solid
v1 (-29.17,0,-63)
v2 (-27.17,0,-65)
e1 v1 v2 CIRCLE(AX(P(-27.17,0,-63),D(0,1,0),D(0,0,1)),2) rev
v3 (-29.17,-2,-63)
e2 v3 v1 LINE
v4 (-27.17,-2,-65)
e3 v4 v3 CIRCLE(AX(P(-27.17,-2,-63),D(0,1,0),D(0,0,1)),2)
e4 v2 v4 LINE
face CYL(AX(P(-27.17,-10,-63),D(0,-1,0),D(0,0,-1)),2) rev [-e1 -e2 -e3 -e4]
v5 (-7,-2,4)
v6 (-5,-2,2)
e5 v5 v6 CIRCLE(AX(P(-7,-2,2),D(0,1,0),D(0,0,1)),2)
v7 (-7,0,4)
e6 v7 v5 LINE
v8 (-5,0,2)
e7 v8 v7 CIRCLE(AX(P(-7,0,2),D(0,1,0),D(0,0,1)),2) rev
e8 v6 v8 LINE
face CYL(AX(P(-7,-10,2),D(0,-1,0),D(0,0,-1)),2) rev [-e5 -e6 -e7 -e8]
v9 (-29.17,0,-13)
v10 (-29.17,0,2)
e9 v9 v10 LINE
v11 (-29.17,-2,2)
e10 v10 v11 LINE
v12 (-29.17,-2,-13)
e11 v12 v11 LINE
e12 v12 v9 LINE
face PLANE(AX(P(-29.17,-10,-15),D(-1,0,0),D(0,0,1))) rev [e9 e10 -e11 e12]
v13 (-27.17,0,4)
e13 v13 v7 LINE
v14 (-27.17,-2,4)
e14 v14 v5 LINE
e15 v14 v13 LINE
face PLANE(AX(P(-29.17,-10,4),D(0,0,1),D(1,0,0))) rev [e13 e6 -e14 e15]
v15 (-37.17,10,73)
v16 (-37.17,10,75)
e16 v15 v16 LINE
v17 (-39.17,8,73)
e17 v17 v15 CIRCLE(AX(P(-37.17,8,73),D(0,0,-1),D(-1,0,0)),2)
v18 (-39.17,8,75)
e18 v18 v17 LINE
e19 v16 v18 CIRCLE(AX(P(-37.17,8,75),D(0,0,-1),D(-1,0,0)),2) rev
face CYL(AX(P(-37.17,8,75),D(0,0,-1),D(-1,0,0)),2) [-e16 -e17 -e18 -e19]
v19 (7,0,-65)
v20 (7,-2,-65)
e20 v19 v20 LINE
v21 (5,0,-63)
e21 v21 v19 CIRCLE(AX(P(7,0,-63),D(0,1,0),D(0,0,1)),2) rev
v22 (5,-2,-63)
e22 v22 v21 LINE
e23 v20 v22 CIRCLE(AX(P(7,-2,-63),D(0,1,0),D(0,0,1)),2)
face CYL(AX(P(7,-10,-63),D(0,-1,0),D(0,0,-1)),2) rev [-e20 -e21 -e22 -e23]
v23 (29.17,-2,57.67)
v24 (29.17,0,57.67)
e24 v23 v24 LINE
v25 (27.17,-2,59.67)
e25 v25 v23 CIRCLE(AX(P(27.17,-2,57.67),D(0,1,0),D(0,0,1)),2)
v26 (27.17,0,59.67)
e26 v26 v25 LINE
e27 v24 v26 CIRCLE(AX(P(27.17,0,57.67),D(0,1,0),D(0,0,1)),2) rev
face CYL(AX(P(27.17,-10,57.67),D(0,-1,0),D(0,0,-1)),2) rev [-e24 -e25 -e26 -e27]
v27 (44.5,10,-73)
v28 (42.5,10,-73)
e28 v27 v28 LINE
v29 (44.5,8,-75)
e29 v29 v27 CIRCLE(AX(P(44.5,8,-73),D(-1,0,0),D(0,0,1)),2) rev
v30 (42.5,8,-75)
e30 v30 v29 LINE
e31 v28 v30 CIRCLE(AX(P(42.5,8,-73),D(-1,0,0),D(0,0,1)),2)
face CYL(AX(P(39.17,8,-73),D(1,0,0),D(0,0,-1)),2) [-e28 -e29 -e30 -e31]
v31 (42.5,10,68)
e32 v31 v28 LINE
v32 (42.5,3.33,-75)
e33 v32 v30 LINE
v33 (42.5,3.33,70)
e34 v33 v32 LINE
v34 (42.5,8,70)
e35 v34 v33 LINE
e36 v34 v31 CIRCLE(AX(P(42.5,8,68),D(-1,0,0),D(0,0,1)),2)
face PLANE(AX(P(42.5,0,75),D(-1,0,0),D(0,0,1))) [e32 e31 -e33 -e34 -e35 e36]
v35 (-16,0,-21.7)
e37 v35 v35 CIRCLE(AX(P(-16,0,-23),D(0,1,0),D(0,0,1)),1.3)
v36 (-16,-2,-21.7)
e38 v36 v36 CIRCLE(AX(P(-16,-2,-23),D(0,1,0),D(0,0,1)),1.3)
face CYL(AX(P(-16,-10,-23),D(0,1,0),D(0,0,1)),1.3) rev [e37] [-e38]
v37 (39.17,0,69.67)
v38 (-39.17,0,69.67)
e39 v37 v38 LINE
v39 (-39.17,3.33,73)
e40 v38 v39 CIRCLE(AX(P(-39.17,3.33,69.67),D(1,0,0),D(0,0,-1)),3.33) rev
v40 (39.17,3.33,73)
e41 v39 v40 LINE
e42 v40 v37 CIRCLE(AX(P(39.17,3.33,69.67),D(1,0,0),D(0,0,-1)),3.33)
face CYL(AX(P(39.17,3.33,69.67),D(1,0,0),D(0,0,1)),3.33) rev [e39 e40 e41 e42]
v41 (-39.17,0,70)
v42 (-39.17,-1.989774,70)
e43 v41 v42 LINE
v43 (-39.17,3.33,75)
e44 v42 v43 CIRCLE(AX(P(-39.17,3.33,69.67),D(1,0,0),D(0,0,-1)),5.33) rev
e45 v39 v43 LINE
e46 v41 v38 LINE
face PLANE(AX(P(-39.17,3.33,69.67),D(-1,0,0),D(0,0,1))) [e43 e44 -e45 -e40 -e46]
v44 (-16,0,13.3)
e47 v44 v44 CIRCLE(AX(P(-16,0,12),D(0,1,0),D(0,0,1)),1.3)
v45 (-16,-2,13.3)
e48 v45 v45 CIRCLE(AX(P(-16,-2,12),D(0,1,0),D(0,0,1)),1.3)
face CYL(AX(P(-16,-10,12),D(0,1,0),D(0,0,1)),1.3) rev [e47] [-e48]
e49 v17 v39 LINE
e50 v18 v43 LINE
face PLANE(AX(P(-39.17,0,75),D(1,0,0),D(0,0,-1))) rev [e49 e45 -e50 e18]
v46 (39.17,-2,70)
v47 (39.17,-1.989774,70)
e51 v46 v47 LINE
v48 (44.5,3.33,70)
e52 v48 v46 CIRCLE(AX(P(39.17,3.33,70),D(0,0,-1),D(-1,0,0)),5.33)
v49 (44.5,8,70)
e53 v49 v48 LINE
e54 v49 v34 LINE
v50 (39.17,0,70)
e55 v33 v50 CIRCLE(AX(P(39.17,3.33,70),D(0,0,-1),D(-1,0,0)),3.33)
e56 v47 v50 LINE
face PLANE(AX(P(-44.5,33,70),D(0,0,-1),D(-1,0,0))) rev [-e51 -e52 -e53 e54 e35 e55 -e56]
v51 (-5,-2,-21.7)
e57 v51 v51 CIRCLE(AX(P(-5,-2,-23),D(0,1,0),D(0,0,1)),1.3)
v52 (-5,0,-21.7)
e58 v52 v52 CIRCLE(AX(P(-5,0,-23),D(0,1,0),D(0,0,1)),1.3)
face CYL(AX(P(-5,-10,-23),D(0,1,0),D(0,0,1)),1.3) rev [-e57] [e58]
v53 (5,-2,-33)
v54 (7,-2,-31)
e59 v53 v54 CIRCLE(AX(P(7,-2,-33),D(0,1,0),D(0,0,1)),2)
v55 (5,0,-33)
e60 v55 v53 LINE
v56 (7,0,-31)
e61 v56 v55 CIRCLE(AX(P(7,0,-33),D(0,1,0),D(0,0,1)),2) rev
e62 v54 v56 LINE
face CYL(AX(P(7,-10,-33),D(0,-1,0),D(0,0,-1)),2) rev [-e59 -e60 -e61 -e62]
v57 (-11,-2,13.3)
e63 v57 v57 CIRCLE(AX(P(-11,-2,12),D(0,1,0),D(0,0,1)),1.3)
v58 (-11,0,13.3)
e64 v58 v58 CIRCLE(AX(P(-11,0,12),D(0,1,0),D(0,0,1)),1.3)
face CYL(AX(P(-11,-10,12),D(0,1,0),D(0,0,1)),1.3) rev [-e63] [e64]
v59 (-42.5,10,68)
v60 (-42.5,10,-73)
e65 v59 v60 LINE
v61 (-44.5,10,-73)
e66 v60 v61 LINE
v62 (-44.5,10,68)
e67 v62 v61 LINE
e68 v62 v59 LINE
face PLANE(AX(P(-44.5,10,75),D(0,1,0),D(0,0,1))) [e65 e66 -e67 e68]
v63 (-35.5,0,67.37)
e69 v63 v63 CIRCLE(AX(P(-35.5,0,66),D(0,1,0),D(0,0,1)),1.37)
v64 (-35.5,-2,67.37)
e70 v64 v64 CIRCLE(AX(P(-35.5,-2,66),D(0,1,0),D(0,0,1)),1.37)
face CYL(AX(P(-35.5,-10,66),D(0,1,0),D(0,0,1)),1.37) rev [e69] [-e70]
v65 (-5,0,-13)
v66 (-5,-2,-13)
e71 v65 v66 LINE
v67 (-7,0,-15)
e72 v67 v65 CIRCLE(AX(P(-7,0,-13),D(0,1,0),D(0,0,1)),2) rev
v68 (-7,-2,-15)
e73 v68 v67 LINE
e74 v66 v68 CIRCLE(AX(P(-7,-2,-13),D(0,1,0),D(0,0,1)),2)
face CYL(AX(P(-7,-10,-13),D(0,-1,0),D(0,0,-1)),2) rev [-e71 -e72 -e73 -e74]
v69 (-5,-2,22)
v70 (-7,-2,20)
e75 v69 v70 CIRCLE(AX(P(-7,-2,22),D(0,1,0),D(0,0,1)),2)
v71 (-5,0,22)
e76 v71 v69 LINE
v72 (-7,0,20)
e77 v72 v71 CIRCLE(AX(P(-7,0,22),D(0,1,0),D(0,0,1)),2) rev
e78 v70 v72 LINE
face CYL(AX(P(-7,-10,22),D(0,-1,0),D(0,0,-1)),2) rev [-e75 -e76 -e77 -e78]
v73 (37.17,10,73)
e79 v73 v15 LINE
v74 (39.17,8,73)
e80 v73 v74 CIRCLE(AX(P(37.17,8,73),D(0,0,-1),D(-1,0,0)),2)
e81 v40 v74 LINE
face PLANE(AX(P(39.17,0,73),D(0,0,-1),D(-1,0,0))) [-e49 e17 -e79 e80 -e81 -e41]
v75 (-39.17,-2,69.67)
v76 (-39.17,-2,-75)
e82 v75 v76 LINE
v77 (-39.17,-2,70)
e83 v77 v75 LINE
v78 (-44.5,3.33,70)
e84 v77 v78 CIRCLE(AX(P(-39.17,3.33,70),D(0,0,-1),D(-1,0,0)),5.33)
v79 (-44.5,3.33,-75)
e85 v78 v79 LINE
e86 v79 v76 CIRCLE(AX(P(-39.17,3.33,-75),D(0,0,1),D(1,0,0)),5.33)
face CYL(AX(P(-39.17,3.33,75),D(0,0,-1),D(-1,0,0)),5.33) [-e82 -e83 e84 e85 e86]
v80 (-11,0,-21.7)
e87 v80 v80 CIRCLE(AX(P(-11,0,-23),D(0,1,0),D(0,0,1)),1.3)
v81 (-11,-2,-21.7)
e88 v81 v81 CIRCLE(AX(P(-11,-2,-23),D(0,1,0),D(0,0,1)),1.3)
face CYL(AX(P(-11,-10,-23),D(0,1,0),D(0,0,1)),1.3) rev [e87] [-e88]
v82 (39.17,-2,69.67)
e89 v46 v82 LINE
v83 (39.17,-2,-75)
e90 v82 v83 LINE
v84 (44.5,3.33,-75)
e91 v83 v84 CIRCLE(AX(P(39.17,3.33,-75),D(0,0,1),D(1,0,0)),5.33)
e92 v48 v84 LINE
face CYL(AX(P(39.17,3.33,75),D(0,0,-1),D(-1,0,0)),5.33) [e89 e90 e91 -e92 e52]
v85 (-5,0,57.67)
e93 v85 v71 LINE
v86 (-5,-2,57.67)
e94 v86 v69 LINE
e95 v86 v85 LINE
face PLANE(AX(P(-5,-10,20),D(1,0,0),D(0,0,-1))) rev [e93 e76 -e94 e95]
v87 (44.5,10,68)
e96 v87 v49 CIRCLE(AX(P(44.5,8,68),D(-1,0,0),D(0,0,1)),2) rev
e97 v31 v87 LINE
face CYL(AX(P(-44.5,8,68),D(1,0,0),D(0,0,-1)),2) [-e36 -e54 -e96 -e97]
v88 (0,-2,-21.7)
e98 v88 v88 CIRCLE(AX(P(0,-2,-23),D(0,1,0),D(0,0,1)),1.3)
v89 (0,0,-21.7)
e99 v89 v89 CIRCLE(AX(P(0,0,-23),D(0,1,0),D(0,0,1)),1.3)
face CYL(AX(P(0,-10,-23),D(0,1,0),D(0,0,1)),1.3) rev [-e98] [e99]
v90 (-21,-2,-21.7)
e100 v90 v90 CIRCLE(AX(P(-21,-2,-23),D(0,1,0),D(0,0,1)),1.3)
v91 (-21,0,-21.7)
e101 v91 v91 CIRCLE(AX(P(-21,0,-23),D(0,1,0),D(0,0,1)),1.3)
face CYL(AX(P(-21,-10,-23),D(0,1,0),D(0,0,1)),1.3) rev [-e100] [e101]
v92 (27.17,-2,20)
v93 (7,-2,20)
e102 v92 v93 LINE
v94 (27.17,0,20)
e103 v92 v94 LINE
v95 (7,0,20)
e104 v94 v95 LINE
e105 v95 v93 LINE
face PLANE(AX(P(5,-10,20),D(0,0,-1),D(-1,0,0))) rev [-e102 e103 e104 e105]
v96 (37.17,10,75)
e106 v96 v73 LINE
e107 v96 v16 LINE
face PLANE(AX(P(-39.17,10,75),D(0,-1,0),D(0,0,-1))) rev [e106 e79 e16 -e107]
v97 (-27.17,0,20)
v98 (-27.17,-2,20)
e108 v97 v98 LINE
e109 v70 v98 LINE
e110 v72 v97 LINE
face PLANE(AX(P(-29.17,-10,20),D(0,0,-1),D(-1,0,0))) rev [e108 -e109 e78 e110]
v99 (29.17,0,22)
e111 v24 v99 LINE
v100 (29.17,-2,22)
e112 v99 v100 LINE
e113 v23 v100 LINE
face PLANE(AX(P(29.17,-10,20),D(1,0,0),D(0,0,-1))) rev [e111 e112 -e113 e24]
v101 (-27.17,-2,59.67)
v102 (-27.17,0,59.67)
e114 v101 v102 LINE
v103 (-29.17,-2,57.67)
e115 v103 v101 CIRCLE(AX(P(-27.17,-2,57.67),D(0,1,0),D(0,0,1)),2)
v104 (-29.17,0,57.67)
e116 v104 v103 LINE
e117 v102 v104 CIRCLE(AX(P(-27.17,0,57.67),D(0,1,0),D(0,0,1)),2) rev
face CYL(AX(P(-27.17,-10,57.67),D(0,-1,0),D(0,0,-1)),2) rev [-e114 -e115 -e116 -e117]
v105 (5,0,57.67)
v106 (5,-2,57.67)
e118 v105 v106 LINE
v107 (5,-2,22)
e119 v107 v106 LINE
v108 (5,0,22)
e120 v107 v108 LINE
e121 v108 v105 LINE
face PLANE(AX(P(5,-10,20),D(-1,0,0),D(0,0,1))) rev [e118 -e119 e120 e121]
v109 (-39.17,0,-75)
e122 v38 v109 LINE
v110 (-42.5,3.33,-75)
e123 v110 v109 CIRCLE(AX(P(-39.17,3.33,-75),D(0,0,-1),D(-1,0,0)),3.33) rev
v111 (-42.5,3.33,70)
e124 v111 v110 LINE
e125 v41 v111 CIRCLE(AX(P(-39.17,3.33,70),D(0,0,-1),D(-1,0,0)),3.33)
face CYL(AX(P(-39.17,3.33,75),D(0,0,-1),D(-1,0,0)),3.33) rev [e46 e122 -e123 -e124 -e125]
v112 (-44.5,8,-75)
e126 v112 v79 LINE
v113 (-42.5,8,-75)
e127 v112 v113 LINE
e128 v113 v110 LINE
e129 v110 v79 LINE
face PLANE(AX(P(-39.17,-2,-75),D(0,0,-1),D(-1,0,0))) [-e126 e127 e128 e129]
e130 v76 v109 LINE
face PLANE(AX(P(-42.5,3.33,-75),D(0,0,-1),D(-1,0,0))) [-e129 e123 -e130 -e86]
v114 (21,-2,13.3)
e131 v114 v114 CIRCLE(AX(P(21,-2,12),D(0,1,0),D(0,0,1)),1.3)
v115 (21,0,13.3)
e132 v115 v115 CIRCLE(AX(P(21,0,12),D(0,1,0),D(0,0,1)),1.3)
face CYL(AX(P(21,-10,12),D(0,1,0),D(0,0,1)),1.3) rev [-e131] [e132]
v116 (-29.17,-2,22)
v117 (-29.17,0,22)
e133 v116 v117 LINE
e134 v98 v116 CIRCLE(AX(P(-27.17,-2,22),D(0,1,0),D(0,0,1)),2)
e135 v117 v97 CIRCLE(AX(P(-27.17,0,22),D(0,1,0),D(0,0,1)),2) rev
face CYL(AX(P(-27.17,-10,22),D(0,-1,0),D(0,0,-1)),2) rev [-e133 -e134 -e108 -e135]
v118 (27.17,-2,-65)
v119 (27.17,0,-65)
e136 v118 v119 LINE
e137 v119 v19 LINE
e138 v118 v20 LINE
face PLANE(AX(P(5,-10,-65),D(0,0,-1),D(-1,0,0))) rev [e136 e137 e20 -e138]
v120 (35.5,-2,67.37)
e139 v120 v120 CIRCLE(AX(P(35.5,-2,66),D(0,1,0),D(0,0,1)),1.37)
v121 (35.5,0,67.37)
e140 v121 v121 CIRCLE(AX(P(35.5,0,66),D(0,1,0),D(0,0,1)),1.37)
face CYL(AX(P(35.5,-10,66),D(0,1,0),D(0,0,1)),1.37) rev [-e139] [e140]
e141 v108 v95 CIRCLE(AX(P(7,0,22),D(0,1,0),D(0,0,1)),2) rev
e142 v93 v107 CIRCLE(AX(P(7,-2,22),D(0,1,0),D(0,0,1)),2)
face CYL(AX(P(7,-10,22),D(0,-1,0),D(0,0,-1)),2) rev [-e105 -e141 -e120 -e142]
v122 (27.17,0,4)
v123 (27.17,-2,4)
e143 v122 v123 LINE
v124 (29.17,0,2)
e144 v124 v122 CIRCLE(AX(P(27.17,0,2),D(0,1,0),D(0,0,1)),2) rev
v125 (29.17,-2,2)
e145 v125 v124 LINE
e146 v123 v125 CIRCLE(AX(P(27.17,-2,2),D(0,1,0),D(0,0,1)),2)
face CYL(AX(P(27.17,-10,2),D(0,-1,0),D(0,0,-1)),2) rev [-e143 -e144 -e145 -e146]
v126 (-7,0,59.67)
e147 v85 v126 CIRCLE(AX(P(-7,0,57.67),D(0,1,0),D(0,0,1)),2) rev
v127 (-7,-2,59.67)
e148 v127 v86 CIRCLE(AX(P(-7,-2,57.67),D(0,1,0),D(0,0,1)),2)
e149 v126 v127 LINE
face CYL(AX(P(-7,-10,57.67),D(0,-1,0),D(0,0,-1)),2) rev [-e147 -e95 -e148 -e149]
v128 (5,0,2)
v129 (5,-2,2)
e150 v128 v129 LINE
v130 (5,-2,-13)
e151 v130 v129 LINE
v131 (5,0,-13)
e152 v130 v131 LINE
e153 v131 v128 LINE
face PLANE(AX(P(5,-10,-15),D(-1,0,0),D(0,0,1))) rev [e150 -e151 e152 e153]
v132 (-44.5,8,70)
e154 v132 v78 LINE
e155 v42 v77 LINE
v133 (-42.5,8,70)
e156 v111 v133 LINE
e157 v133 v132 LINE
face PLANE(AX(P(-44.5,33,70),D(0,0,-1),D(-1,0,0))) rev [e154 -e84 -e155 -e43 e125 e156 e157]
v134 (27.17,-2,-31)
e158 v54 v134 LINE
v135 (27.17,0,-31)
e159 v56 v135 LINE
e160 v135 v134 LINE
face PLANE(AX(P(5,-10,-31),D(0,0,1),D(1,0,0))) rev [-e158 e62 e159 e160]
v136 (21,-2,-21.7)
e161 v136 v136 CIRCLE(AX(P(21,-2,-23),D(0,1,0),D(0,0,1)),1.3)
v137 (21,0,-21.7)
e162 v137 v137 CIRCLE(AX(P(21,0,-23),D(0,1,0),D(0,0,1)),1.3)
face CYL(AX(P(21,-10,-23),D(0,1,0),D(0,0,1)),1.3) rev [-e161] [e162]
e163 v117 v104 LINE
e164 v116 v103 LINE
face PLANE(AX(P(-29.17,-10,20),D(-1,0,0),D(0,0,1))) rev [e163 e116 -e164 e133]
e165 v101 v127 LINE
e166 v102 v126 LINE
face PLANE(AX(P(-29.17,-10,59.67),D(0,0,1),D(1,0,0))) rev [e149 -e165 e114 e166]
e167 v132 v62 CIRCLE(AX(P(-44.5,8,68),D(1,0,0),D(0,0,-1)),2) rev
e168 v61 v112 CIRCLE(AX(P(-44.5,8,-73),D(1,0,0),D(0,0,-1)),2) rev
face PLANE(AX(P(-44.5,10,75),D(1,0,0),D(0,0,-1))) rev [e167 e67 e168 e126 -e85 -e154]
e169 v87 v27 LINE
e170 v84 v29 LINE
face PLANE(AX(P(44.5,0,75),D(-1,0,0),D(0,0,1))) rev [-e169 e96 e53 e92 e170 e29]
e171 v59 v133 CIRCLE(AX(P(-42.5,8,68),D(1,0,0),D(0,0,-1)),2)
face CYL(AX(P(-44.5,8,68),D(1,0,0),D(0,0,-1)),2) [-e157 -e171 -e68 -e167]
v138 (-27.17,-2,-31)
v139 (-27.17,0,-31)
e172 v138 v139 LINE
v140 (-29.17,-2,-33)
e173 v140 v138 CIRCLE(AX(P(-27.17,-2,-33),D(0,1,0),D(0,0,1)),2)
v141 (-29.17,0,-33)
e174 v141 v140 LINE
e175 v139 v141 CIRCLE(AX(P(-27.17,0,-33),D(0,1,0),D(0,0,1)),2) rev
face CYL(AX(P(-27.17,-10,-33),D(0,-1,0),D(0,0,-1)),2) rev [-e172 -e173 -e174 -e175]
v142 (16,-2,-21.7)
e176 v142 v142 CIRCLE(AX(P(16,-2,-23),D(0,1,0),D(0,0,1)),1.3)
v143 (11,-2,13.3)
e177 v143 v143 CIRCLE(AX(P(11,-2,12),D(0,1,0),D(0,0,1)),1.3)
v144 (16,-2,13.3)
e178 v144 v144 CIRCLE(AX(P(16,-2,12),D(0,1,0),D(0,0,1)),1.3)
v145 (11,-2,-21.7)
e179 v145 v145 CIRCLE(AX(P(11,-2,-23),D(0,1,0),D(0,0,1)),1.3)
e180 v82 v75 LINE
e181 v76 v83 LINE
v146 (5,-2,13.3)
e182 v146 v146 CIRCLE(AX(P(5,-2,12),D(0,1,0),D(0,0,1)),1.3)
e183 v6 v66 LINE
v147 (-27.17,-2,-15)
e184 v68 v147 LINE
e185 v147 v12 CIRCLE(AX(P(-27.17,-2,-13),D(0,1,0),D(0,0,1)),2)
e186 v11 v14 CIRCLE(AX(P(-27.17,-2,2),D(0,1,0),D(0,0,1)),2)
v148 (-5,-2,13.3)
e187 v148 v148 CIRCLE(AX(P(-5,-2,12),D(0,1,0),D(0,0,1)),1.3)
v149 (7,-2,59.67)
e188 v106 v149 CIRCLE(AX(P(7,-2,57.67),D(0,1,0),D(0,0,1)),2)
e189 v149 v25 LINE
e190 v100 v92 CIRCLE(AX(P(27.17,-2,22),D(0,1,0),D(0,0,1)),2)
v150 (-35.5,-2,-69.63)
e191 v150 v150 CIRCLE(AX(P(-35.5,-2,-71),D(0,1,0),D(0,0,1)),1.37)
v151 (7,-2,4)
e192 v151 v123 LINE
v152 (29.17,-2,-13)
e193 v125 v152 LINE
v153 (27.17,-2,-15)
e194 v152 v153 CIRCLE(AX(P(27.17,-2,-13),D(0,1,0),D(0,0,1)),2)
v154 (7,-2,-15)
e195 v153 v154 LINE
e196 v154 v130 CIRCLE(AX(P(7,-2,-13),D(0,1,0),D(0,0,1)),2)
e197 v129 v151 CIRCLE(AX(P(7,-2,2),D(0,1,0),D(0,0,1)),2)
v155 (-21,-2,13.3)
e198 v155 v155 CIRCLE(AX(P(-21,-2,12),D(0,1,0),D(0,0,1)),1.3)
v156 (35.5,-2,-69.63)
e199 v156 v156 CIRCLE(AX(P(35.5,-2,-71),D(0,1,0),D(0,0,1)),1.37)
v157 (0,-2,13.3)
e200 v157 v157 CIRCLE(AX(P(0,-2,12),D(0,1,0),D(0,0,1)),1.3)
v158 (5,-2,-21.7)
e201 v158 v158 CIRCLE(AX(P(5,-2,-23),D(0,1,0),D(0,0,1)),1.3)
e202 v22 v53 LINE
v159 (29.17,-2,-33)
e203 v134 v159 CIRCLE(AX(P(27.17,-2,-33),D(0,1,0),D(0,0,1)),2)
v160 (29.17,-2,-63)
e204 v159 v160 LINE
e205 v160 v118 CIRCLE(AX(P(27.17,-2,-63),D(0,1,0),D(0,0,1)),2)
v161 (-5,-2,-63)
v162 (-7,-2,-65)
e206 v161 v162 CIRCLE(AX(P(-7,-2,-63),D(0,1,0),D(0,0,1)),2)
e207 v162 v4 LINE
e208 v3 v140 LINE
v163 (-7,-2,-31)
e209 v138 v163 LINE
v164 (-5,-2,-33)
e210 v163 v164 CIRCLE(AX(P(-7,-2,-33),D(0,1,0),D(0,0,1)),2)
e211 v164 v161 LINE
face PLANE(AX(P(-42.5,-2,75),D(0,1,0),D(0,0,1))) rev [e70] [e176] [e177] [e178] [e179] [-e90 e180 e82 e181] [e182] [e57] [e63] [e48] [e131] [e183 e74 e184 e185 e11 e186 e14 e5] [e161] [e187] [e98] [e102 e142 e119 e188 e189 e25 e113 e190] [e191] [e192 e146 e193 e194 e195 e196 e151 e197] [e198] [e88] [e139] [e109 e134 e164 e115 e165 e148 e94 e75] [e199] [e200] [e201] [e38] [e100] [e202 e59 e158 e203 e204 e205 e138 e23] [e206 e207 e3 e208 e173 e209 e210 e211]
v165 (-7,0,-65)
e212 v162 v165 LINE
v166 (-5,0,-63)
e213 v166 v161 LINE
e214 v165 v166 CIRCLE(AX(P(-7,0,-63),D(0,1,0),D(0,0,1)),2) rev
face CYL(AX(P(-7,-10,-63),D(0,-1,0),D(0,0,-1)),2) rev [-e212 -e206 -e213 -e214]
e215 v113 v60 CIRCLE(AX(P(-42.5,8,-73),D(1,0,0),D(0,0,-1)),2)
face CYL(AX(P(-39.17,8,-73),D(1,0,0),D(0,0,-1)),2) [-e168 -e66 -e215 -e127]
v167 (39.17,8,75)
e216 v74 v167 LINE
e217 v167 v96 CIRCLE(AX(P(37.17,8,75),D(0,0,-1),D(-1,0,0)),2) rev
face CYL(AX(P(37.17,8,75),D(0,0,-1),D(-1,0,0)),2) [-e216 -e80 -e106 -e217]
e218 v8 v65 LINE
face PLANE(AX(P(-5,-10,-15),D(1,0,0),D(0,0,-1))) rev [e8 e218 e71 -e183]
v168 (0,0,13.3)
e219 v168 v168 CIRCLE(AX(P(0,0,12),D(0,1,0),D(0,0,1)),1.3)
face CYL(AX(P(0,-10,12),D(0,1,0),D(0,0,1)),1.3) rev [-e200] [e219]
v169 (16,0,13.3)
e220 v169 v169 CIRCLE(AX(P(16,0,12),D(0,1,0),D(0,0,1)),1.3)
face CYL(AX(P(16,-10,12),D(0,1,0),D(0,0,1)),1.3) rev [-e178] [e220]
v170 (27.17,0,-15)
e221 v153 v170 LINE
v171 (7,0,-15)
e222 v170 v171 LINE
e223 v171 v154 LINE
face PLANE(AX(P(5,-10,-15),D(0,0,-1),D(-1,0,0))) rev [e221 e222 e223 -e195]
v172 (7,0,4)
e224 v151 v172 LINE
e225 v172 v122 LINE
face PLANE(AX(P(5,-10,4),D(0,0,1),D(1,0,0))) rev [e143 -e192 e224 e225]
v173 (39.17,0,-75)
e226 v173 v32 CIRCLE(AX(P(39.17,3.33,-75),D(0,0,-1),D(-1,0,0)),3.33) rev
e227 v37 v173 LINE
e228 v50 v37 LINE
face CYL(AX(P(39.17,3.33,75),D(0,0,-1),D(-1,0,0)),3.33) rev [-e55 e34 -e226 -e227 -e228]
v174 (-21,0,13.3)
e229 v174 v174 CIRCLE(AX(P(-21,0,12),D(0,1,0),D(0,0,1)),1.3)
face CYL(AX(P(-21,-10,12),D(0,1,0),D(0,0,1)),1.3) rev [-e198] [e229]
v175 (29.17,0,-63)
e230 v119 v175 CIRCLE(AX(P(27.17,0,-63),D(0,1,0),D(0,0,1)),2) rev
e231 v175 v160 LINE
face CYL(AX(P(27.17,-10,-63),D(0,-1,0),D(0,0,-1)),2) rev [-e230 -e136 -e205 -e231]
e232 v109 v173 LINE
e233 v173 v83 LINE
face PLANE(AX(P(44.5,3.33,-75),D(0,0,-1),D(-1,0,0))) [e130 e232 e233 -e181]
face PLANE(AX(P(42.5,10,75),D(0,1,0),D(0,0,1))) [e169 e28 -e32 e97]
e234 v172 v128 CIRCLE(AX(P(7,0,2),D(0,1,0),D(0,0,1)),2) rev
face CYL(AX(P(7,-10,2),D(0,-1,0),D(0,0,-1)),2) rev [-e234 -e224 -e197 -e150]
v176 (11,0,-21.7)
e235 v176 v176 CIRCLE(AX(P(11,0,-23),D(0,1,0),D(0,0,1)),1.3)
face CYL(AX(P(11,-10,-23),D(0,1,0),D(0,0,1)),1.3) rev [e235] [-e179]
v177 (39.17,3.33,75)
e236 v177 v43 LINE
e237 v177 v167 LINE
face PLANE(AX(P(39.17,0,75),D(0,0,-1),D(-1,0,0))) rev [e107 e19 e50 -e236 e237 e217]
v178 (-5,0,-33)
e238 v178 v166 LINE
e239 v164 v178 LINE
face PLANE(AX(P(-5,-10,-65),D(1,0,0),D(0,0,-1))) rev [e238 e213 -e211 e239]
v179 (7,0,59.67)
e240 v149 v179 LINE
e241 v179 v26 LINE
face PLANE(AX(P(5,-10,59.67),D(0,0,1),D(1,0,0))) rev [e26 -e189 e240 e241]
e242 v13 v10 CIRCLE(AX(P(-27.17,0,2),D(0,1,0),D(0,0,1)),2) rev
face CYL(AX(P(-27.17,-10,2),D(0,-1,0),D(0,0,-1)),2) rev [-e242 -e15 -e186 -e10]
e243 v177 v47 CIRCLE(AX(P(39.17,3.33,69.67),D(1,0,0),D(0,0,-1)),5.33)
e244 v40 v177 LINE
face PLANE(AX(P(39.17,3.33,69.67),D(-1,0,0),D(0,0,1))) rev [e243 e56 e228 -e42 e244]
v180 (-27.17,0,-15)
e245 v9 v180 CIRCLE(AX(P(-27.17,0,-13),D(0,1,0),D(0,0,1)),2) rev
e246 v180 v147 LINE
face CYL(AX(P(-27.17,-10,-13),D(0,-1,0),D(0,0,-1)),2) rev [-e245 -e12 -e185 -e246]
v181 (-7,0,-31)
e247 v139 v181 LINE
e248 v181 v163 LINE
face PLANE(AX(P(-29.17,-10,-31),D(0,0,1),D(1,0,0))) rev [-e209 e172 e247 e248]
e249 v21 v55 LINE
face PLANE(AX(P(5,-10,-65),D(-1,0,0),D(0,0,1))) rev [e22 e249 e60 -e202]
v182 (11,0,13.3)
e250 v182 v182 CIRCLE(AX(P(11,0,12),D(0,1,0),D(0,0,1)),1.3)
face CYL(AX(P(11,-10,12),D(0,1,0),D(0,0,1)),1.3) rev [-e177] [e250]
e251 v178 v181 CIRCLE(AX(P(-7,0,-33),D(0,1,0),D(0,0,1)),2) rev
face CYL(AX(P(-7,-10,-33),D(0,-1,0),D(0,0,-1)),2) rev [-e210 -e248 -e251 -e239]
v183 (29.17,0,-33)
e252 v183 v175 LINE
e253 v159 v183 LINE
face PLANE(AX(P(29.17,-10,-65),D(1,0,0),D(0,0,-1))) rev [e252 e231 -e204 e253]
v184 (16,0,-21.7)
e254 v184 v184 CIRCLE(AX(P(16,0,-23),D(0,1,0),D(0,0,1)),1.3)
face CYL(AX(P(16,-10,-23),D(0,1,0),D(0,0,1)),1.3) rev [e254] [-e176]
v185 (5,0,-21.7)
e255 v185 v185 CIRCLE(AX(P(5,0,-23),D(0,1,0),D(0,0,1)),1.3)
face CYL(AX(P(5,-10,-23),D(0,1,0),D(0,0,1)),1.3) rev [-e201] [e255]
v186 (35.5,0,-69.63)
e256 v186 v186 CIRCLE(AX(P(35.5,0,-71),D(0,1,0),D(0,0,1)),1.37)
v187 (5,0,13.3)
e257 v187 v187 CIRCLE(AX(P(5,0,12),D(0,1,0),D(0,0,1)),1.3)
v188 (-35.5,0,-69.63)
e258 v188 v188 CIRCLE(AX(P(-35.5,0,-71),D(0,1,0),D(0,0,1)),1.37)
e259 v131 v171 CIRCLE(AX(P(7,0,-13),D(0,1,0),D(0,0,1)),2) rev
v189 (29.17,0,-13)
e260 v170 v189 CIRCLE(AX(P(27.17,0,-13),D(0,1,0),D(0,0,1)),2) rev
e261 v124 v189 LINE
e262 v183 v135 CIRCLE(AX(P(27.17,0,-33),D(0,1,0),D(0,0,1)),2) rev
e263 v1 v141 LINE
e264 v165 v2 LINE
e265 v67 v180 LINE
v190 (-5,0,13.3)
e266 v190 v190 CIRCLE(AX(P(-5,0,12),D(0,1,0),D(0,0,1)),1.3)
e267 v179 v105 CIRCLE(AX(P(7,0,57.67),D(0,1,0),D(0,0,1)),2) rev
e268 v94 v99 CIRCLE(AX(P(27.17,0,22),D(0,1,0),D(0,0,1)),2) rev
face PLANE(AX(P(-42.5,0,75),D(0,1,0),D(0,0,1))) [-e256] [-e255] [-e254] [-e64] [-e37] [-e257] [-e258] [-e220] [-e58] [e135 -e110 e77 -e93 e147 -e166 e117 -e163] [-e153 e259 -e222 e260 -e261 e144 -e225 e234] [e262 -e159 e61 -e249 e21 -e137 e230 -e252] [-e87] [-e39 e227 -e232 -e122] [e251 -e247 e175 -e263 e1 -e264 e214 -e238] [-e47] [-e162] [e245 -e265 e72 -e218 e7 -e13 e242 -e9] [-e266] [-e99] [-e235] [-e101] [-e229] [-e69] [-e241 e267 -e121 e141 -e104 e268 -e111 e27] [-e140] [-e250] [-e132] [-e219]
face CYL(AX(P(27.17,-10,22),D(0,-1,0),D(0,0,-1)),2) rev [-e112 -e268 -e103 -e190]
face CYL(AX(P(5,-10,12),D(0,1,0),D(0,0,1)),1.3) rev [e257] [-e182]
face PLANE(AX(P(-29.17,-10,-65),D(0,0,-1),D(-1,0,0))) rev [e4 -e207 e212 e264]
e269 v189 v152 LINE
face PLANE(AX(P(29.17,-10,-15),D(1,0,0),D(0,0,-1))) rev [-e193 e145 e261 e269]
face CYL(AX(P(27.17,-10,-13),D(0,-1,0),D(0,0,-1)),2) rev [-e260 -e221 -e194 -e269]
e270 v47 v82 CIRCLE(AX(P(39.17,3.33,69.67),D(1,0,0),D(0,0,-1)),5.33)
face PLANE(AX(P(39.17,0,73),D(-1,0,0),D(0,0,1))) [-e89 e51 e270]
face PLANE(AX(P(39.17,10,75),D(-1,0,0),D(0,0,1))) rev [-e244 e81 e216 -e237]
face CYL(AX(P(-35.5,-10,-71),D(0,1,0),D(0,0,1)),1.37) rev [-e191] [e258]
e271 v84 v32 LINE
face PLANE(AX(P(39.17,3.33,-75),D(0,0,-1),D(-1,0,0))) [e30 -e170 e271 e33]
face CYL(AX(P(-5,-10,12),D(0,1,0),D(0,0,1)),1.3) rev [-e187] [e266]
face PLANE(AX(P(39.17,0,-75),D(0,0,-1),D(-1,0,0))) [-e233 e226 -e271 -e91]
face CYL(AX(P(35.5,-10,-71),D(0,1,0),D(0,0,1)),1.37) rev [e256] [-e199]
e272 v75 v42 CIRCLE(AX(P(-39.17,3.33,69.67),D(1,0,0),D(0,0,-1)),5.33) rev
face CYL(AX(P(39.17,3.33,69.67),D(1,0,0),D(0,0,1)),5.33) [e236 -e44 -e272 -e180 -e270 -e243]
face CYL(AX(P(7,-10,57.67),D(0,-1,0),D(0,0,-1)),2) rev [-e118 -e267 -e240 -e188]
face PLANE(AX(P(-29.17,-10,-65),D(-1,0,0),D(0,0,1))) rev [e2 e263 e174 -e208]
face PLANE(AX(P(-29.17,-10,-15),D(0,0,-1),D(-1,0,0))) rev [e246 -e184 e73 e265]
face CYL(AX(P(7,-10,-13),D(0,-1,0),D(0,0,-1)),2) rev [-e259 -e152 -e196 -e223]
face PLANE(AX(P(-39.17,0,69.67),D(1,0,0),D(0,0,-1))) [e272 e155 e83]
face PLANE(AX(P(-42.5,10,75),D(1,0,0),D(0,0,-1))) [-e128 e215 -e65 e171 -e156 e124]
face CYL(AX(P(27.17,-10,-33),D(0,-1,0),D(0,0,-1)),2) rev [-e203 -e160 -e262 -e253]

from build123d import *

# Parameters (mm, degrees)
BASE_FLANGE1_DEPTH           = 75
SKETCH5_R                    = 1.3
CUT_EXTRUDE1_DEPTH           = 10
SKETCH6_W                    = 89
SKETCH6_H                    = 5
CUT_EXTRUDE2_DEPTH           = 35
SKETCH9_W                    = 78.34
SKETCH9_H                    = 2
BOSS_EXTRUDE1_DEPTH          = 3
EDGE_FLANGE1_STRIP_W         = 14.66
EDGE_FLANGE1_STRIP_H         = 2
EDGE_FLANGE1_STRIP_CUT_DEPTH = 78.34
EDGE_FLANGE1_DEPTH           = 78.34
FILLET1_R                    = 2
SKETCH13_W                   = 24.17
SKETCH13_H                   = 34
SKETCH13_H_2                 = 19
SKETCH13_H_3                 = 39.67
CUT_EXTRUDE3_DEPTH           = 10
FILLET2_R                    = 2
SKETCH14_R                   = 1.37
CUT_EXTRUDE4_DEPTH           = 10


# Sheet-metal steps are written as plain solids
with BuildPart() as part:
    # Sketch1 → Base-Flange1 (new, symmetric)
    with BuildSketch(Plane.XY):
        with BuildLine():
            Line((-42.5, 10), (-42.5, 3.33))
            ThreePointArc((-42.5, 3.33), (-41.524665581, 0.975334419), (-39.17, 0))
            Line((-39.17, 0), (39.17, 0))
            ThreePointArc((39.17, 0), (41.524665581, 0.975334419), (42.5, 3.33))
            Line((42.5, 3.33), (42.5, 10))
            Line((42.5, 10), (44.5, 10))
            Line((44.5, 10), (44.5, 3.33))
            ThreePointArc((44.5, 3.33), (42.938879144, -0.438879144), (39.17, -2))
            Line((39.17, -2), (-39.17, -2))
            ThreePointArc((-39.17, -2), (-42.938879144, -0.438879144), (-44.5, 3.33))
            Line((-44.5, 3.33), (-44.5, 10))
            Line((-44.5, 10), (-42.5, 10))
        make_face()
    extrude(amount=BASE_FLANGE1_DEPTH, both=True)

    # Sketch5 → Cut-Extrude1 (cut)
    with BuildSketch(Plane(origin=(0, 0, 0), x_dir=(-1, 0, 0), z_dir=(0, 1, 0))):
        with Locations(Location((0, -23, 0), (0, 0, 90))):
            Circle(SKETCH5_R)
        with Locations(Location((16, -23, 0), (0, 0, 90))):
            Circle(SKETCH5_R)
        with Locations(Location((16, 12, 0), (0, 0, 90))):
            Circle(SKETCH5_R)
        with Locations(Location((0, 12, 0), (0, 0, 90))):
            Circle(SKETCH5_R)
        with Locations(Location((-16, 12, 0), (0, 0, 90))):
            Circle(SKETCH5_R)
        with Locations(Location((-16, -23, 0), (0, 0, 90))):
            Circle(SKETCH5_R)
        with Locations(Location((11, 12, 0), (0, 0, 90))):
            Circle(SKETCH5_R)
        with Locations(Location((5, 12, 0), (0, 0, 90))):
            Circle(SKETCH5_R)
        with Locations(Location((-5, 12, 0), (0, 0, 90))):
            Circle(SKETCH5_R)
        with Locations(Location((-11, 12, 0), (0, 0, 90))):
            Circle(SKETCH5_R)
        with Locations(Location((11, -23, 0), (0, 0, 90))):
            Circle(SKETCH5_R)
        with Locations(Location((5, -23, 0), (0, 0, 90))):
            Circle(SKETCH5_R)
        with Locations(Location((-5, -23, 0), (0, 0, 90))):
            Circle(SKETCH5_R)
        with Locations(Location((-11, -23, 0), (0, 0, 90))):
            Circle(SKETCH5_R)
        with Locations(Location((21, 12, 0), (0, 0, 90))):
            Circle(SKETCH5_R)
        with Locations(Location((21, -23, 0), (0, 0, 90))):
            Circle(SKETCH5_R)
        with Locations(Location((-21, -23, 0), (0, 0, 90))):
            Circle(SKETCH5_R)
        with Locations(Location((-21, 12, 0), (0, 0, 90))):
            Circle(SKETCH5_R)
    extrude(amount=-CUT_EXTRUDE1_DEPTH, mode=Mode.SUBTRACT)

    # Sketch6 → Cut-Extrude2 (cut)
    with BuildSketch(Plane.XZ.offset(2)):
        with Locations((0, 72.5)):
            Rectangle(SKETCH6_W, SKETCH6_H)
    extrude(amount=-CUT_EXTRUDE2_DEPTH, mode=Mode.SUBTRACT)

    # Sketch9 → Boss-Extrude1 (add)
    with BuildSketch(Plane.XY.offset(70)):
        with Locations((0, -1)):
            Rectangle(SKETCH9_W, SKETCH9_H)
    extrude(amount=BOSS_EXTRUDE1_DEPTH)

    # Edge-Flange1 strip (across the edge) → Edge-Flange1 strip cut (cut)
    with BuildSketch(Plane(origin=(-39.17, 0, 73), x_dir=(0, 0, -1), z_dir=(1, 0, 0))):
        with Locations((-4, -1)):
            Rectangle(EDGE_FLANGE1_STRIP_W, EDGE_FLANGE1_STRIP_H)
    extrude(amount=EDGE_FLANGE1_STRIP_CUT_DEPTH, mode=Mode.SUBTRACT)

    # Edge-Flange1 section (across the edge) → Edge-Flange1 (add)
    with BuildSketch(Plane(origin=(-39.17, 0, 73), x_dir=(0, 0, -1), z_dir=(1, 0, 0))):
        with BuildLine():
            Line((-2, 3.33), (-2, 10))
            Line((-2, 10), (0, 10))
            Line((0, 10), (0, 3.33))
            ThreePointArc((0, 3.33), (0.975334419, 0.975334419), (3.33, 0))
            Line((3.33, 0), (3.33, -2))
            ThreePointArc((3.33, -2), (-0.438879144, -0.438879144), (-2, 3.33))
        make_face()
    extrude(amount=EDGE_FLANGE1_DEPTH)

    # Fillet1
    fillet1_edges = [part.edges().sort_by_distance(p)[0] for p in [
        (-43.5, 10, -75),
        (43.5, 10, -75),
        (43.5, 10, 70),
        (-43.5, 10, 70),
        (-39.17, 10, 74),
        (39.17, 10, 74),
    ]]
    fillet(fillet1_edges, radius=FILLET1_R)

    # Sketch13 → Cut-Extrude3 (cut)
    with BuildSketch(Plane(origin=(0, 0, 0), x_dir=(1, 0, 0), z_dir=(0, 1, 0))):
        with Locations((-17.085, 48)):
            Rectangle(SKETCH13_W, SKETCH13_H)
        with Locations((17.085, 48)):
            Rectangle(SKETCH13_W, SKETCH13_H)
        with Locations((-17.085, 5.5)):
            Rectangle(SKETCH13_W, SKETCH13_H_2)
        with Locations((17.085, 5.5)):
            Rectangle(SKETCH13_W, SKETCH13_H_2)
        with Locations((-17.085, -39.835)):
            Rectangle(SKETCH13_W, SKETCH13_H_3)
        with Locations((17.085, -39.835)):
            Rectangle(SKETCH13_W, SKETCH13_H_3)
    extrude(amount=-CUT_EXTRUDE3_DEPTH, mode=Mode.SUBTRACT)

    # Fillet2
    fillet2_edges = [part.edges().sort_by_distance(p)[0] for p in [
        (-29.17, -1, -31),
        (-29.17, -1, -65),
        (-5, -1, -65),
        (-5, -1, -31),
        (5, -1, -31),
        (5, -1, -65),
        (29.17, -1, -65),
        (29.17, -1, -31),
        (-29.17, -1, 4),
        (-29.17, -1, -15),
        (-5, -1, -15),
        (-5, -1, 4),
        (5, -1, 4),
        (5, -1, -15),
        (29.17, -1, -15),
        (29.17, -1, 4),
        (-29.17, -1, 59.67),
        (-29.17, -1, 20),
        (-5, -1, 20),
        (-5, -1, 59.67),
        (5, -1, 59.67),
        (5, -1, 20),
        (29.17, -1, 20),
        (29.17, -1, 59.67),
    ]]
    fillet(fillet2_edges, radius=FILLET2_R)

    # Sketch14 → Cut-Extrude4 (cut)
    with BuildSketch(Plane(origin=(0, 0, 0), x_dir=(1, 0, 0), z_dir=(0, 1, 0))):
        with Locations(Location((-35.5, 71, 0), (0, 0, 270))):
            Circle(SKETCH14_R)
        with Locations(Location((35.5, 71, 0), (0, 0, 270))):
            Circle(SKETCH14_R)
        with Locations(Location((35.5, -66, 0), (0, 0, 270))):
            Circle(SKETCH14_R)
        with Locations(Location((-35.5, -66, 0), (0, 0, 270))):
            Circle(SKETCH14_R)
    extrude(amount=-CUT_EXTRUDE4_DEPTH, mode=Mode.SUBTRACT)


solid = part.part
